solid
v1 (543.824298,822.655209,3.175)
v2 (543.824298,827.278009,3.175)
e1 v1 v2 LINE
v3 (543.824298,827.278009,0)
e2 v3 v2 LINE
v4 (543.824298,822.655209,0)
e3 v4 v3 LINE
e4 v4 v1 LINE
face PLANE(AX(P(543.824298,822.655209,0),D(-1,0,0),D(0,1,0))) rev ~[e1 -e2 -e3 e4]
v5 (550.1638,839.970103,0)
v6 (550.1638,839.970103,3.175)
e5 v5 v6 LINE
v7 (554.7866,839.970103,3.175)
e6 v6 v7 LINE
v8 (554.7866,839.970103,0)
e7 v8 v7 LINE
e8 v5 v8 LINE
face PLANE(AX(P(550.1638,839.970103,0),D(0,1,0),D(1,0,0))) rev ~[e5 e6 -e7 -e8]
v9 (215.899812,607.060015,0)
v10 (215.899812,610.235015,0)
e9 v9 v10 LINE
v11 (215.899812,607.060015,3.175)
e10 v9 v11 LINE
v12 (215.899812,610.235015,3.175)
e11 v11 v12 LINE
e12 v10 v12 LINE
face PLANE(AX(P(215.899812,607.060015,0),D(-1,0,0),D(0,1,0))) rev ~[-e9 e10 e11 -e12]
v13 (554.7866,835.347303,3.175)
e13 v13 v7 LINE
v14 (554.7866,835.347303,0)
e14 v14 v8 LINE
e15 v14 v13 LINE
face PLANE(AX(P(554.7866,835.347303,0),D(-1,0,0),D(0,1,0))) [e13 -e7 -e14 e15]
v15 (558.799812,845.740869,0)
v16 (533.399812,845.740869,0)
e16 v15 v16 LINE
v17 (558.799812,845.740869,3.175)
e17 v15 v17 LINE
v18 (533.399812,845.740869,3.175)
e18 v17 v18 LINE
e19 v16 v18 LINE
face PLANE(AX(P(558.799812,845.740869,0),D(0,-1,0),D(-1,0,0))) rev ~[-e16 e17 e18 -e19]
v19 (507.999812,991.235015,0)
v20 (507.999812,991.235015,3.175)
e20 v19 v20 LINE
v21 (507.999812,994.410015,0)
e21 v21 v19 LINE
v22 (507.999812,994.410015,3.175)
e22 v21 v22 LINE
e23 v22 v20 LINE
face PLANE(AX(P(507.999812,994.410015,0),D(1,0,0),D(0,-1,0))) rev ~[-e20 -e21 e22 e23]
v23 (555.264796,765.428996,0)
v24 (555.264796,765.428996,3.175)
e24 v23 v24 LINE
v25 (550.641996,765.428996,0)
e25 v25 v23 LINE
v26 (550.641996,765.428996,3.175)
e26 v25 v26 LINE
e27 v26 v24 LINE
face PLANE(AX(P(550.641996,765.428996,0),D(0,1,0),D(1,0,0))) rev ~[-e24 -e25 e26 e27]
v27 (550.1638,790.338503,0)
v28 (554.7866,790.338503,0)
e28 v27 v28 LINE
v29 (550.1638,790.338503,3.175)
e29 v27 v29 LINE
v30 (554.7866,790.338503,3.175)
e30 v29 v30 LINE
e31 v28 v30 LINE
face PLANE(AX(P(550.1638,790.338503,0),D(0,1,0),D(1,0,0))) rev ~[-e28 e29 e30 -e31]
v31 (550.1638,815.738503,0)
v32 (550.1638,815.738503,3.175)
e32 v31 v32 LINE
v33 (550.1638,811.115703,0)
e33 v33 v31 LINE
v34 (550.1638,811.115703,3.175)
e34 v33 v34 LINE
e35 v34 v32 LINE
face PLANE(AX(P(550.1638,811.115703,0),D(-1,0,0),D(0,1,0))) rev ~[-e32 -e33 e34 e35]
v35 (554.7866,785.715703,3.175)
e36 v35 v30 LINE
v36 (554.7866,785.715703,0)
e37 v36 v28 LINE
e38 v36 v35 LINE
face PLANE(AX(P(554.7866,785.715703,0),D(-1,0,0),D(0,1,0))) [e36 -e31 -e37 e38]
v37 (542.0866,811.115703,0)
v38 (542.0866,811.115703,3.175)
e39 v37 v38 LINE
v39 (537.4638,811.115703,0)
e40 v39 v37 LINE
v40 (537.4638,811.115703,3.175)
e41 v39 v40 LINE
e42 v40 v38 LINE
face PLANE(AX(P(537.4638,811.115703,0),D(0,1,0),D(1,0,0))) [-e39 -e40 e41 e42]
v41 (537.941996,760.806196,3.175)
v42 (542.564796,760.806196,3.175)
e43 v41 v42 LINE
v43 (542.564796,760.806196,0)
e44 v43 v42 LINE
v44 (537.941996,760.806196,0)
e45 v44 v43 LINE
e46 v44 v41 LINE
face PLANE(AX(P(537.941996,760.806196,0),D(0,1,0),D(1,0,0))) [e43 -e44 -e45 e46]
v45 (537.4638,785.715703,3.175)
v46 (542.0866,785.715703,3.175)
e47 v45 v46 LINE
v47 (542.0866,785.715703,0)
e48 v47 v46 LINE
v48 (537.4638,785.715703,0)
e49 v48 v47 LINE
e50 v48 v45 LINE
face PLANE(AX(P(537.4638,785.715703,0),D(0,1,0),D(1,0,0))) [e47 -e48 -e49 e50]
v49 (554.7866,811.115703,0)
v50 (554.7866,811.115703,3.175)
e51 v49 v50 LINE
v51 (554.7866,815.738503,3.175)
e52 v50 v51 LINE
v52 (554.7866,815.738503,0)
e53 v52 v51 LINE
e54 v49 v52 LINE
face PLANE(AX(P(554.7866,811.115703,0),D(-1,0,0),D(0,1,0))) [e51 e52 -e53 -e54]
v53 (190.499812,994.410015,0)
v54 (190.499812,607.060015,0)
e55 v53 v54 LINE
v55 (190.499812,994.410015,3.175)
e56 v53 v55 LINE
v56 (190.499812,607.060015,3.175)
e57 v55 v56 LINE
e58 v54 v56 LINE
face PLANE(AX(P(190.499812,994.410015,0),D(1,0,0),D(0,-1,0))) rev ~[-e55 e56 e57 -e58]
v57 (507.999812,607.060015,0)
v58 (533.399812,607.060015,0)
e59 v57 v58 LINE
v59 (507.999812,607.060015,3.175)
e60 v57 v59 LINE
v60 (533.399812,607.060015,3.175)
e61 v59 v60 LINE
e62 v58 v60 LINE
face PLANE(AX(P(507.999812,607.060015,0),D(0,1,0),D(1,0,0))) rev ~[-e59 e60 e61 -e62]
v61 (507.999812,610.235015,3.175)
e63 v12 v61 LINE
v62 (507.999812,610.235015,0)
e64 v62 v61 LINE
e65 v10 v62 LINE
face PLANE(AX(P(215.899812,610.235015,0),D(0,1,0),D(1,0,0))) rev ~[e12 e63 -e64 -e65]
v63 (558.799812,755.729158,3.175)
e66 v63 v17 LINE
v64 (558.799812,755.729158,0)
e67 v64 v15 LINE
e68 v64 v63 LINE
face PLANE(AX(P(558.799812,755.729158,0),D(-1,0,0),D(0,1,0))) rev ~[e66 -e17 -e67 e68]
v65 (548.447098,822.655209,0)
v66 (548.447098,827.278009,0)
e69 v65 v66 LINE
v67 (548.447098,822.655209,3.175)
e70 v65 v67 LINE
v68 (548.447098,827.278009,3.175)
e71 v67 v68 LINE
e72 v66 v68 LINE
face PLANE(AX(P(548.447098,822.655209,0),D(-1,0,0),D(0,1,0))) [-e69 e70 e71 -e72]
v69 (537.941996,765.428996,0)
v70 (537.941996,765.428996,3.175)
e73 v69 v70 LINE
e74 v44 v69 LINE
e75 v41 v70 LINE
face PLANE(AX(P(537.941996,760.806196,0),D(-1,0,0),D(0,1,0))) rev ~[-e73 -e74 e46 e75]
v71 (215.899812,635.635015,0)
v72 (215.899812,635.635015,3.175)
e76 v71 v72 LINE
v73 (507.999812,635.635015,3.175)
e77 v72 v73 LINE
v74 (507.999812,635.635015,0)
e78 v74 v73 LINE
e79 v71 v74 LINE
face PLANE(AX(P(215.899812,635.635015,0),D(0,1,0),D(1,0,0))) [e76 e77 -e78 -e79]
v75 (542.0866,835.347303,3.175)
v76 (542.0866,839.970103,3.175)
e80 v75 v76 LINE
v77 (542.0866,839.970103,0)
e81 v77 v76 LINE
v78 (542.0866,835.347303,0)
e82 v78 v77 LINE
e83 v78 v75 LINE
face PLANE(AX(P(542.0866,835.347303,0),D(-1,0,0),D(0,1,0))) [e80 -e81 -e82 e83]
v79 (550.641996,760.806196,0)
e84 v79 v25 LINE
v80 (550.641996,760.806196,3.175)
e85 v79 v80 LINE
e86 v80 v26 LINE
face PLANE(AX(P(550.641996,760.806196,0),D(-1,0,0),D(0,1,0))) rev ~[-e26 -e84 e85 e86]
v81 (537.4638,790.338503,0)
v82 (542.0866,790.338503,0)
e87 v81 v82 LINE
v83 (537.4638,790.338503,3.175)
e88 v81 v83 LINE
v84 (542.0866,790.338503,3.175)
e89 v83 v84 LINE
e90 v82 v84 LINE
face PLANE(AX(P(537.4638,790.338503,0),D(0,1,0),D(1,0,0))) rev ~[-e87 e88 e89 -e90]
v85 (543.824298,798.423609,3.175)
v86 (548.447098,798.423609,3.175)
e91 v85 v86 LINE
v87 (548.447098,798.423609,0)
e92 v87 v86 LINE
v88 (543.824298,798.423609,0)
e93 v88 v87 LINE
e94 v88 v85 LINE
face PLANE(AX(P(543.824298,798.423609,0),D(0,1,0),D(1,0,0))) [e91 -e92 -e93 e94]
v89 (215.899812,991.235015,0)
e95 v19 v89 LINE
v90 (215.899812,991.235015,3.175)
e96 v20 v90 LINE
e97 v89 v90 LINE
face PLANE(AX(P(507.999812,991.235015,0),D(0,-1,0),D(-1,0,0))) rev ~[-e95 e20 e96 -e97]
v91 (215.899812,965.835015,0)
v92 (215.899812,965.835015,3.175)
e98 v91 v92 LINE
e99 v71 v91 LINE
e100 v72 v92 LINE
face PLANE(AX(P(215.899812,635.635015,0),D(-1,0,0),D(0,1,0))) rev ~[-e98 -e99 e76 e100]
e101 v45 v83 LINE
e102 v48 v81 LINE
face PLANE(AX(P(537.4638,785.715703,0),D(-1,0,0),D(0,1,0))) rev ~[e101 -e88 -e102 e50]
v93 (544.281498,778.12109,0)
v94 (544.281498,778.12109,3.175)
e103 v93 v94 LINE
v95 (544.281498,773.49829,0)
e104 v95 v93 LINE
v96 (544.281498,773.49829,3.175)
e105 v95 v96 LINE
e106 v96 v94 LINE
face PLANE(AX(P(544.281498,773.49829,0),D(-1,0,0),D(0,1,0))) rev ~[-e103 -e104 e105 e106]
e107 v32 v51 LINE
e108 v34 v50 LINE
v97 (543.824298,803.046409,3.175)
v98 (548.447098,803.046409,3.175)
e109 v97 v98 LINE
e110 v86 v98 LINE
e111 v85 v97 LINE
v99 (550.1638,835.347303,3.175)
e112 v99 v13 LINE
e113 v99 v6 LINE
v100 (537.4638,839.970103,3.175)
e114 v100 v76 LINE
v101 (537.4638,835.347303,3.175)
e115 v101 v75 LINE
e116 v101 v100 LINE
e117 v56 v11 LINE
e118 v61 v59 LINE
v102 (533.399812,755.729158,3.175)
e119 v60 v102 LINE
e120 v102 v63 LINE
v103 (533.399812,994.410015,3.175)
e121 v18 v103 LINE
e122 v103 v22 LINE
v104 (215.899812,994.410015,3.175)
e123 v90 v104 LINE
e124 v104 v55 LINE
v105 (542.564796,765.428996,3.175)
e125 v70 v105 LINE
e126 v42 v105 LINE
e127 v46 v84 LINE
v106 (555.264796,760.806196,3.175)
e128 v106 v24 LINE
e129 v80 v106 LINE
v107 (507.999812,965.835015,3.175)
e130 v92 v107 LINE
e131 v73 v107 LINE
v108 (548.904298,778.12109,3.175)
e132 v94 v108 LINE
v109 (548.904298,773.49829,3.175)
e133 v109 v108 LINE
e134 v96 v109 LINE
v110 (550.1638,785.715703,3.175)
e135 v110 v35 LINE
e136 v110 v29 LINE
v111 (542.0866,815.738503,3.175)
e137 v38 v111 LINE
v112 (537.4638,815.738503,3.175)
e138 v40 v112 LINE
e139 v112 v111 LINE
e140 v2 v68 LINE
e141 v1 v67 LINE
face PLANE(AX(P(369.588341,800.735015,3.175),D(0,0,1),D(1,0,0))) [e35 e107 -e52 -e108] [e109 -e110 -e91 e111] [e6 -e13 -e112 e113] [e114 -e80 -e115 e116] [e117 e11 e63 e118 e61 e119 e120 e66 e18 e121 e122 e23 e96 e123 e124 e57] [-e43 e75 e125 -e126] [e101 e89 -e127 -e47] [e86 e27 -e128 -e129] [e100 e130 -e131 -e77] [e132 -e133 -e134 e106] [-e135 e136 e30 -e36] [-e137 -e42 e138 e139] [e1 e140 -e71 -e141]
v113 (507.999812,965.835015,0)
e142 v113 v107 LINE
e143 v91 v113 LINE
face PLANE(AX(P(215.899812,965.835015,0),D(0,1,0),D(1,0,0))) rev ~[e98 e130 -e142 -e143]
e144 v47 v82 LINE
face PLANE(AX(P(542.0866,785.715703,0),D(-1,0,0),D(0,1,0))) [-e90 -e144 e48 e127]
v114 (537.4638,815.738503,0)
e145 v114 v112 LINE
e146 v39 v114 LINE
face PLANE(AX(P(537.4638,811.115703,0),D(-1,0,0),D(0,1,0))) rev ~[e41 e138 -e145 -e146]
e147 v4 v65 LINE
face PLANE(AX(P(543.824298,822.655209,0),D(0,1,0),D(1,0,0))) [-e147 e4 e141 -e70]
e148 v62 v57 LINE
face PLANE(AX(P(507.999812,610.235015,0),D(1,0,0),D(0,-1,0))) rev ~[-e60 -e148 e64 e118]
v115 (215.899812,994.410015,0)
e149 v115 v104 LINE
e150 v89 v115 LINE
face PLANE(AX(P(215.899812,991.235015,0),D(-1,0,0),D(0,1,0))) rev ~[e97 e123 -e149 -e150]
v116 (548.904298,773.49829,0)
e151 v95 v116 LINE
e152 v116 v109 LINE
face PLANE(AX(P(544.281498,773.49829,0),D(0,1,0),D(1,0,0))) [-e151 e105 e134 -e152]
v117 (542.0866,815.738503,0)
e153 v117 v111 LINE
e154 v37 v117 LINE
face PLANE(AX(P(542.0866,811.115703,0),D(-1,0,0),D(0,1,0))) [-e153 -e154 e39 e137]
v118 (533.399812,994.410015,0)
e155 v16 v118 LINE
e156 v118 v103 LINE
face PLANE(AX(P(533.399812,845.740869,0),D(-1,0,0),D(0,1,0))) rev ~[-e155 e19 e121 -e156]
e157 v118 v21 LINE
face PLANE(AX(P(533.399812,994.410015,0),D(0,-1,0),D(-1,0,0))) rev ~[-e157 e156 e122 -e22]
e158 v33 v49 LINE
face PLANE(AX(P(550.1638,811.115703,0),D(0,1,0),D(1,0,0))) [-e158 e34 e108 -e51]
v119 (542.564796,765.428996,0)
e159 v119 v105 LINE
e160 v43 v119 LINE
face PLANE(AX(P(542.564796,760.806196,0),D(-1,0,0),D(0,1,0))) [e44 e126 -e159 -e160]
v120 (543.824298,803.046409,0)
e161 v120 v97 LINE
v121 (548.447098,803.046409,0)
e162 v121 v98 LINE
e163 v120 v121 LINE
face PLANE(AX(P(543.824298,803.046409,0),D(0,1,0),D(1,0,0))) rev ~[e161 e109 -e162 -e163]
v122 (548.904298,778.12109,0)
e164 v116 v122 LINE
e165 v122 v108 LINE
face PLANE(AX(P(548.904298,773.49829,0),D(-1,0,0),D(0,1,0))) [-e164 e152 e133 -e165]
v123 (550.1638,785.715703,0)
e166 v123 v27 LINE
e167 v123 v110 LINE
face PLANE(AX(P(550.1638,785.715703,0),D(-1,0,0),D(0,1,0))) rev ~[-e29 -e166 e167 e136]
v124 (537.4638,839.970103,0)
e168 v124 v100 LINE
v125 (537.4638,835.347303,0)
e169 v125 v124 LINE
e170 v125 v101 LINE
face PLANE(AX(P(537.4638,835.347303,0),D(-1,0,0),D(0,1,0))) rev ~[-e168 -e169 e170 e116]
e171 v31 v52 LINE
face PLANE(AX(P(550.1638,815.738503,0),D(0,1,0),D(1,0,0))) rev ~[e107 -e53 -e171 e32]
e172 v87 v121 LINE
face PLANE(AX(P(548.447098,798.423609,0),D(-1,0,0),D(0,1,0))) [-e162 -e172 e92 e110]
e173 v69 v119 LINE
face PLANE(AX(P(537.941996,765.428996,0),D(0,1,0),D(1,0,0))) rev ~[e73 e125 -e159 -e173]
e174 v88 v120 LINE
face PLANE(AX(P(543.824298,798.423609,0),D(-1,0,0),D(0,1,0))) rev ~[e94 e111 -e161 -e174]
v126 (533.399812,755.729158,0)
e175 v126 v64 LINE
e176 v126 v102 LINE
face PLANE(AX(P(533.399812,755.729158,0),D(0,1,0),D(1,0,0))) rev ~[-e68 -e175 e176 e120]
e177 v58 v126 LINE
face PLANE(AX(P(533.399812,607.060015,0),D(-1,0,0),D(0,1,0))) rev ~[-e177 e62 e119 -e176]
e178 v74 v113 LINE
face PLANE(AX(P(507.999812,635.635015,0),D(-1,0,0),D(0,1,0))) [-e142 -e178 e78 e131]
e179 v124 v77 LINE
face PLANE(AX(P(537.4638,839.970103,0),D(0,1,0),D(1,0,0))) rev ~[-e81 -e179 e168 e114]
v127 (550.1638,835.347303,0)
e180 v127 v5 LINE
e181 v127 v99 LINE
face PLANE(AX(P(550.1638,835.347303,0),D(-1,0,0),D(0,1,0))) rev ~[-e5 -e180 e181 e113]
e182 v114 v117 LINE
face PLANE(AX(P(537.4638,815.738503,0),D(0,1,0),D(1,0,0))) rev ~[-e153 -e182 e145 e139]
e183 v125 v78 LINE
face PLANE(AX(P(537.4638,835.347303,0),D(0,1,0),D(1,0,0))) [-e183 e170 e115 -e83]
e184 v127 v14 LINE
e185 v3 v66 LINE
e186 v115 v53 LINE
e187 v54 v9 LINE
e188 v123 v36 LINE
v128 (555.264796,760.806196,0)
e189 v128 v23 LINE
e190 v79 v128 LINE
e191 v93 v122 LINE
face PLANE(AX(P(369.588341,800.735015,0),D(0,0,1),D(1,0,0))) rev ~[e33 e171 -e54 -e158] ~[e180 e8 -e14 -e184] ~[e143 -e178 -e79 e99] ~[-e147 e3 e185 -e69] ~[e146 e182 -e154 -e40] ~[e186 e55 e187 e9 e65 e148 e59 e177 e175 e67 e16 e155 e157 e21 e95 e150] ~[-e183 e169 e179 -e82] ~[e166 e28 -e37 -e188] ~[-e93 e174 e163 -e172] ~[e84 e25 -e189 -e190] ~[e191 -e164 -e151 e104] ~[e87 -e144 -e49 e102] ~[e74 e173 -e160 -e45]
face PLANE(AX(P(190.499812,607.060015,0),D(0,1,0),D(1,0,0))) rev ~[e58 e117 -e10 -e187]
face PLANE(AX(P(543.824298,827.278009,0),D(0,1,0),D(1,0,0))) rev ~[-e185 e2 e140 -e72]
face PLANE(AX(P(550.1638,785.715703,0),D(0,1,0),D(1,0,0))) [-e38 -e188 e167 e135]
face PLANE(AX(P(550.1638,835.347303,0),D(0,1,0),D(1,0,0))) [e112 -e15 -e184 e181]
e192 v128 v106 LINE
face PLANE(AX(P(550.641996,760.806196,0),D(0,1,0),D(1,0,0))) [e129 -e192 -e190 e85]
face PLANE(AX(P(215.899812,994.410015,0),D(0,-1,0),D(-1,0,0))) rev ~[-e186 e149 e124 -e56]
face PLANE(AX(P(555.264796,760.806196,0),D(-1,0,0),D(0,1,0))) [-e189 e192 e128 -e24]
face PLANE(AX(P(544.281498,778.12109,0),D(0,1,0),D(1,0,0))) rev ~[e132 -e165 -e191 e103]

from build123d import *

# Parameters (mm, degrees)
F0_W     = 4.6228
F0_H     = 4.6228
F0_W_2   = 292.1
F0_H_2   = 330.2
F1_DEPTH = 3.175


# Not quite as in the source:
# - a length typed as a fraction of an inch, garbled in the dataset ("3 / 203.2 mm" for 3/8 in), is restored


with BuildPart() as f1:
    # F0 (on Top) → F1 (new body)
    with BuildSketch(Plane.XY):
        Polygon((190.4998123646, 755.6496634722), (190.4998123646, 635.6350152016), (190.4998123646, 610.2350152016), (190.4998123646, 607.0600152016), (215.8998123646, 607.0600152016), (215.8998123646, 610.2350152016), (507.9998123646, 610.2350152016), (507.9998123646, 607.0600152016), (533.3998123646, 607.0600152016), (533.3998123646, 610.2350152016), (533.3998123646, 755.7291580558), (558.7998123646, 755.7291580558), (558.7998123646, 760.8061958763), (558.7998123646, 800.7350152016), (558.7998123646, 845.7408688016), (533.3998123646, 845.7408688016), (533.3998123646, 991.2350152016), (533.3998123646, 994.4100152016), (507.9998123646, 994.4100152016), (507.9998123646, 991.2350152016), (215.8998123646, 991.2350152016), (215.8998123646, 994.4100152016), (190.4998123646, 994.4100152016), (190.4998123646, 991.2350152016), (190.4998123646, 857.2496634722), align=None)
        with Locations((540.2533960062, 763.1175958763)):
            Rectangle(F0_W, F0_H, mode=Mode.SUBTRACT)
        with Locations((552.9533960062, 763.1175958763)):
            Rectangle(F0_W, F0_H, mode=Mode.SUBTRACT)
        with Locations((546.5928981277, 775.8096898529)):
            Rectangle(F0_W, F0_H, mode=Mode.SUBTRACT)
        with Locations((539.7752002493, 788.0271025263)):
            Rectangle(F0_W, F0_H, mode=Mode.SUBTRACT)
        with Locations((552.4752002493, 788.0271025263)):
            Rectangle(F0_W, F0_H, mode=Mode.SUBTRACT)
        with Locations((546.1356981277, 800.7350085497)):
            Rectangle(F0_W, F0_H, mode=Mode.SUBTRACT)
        with Locations((361.9498123646, 800.7350152016)):
            Rectangle(F0_W_2, F0_H_2, mode=Mode.SUBTRACT)
        with Locations((539.7752002493, 813.4271025263)):
            Rectangle(F0_W, F0_H, mode=Mode.SUBTRACT)
        with Locations((552.4752002493, 813.4271025263)):
            Rectangle(F0_W, F0_H, mode=Mode.SUBTRACT)
        with Locations((546.1356981277, 824.9666085497)):
            Rectangle(F0_W, F0_H, mode=Mode.SUBTRACT)
        with Locations((539.7752002493, 837.6587025263)):
            Rectangle(F0_W, F0_H, mode=Mode.SUBTRACT)
        with Locations((552.4752002493, 837.6587025263)):
            Rectangle(F0_W, F0_H, mode=Mode.SUBTRACT)
    extrude(amount=F1_DEPTH)


solid = f1.part
